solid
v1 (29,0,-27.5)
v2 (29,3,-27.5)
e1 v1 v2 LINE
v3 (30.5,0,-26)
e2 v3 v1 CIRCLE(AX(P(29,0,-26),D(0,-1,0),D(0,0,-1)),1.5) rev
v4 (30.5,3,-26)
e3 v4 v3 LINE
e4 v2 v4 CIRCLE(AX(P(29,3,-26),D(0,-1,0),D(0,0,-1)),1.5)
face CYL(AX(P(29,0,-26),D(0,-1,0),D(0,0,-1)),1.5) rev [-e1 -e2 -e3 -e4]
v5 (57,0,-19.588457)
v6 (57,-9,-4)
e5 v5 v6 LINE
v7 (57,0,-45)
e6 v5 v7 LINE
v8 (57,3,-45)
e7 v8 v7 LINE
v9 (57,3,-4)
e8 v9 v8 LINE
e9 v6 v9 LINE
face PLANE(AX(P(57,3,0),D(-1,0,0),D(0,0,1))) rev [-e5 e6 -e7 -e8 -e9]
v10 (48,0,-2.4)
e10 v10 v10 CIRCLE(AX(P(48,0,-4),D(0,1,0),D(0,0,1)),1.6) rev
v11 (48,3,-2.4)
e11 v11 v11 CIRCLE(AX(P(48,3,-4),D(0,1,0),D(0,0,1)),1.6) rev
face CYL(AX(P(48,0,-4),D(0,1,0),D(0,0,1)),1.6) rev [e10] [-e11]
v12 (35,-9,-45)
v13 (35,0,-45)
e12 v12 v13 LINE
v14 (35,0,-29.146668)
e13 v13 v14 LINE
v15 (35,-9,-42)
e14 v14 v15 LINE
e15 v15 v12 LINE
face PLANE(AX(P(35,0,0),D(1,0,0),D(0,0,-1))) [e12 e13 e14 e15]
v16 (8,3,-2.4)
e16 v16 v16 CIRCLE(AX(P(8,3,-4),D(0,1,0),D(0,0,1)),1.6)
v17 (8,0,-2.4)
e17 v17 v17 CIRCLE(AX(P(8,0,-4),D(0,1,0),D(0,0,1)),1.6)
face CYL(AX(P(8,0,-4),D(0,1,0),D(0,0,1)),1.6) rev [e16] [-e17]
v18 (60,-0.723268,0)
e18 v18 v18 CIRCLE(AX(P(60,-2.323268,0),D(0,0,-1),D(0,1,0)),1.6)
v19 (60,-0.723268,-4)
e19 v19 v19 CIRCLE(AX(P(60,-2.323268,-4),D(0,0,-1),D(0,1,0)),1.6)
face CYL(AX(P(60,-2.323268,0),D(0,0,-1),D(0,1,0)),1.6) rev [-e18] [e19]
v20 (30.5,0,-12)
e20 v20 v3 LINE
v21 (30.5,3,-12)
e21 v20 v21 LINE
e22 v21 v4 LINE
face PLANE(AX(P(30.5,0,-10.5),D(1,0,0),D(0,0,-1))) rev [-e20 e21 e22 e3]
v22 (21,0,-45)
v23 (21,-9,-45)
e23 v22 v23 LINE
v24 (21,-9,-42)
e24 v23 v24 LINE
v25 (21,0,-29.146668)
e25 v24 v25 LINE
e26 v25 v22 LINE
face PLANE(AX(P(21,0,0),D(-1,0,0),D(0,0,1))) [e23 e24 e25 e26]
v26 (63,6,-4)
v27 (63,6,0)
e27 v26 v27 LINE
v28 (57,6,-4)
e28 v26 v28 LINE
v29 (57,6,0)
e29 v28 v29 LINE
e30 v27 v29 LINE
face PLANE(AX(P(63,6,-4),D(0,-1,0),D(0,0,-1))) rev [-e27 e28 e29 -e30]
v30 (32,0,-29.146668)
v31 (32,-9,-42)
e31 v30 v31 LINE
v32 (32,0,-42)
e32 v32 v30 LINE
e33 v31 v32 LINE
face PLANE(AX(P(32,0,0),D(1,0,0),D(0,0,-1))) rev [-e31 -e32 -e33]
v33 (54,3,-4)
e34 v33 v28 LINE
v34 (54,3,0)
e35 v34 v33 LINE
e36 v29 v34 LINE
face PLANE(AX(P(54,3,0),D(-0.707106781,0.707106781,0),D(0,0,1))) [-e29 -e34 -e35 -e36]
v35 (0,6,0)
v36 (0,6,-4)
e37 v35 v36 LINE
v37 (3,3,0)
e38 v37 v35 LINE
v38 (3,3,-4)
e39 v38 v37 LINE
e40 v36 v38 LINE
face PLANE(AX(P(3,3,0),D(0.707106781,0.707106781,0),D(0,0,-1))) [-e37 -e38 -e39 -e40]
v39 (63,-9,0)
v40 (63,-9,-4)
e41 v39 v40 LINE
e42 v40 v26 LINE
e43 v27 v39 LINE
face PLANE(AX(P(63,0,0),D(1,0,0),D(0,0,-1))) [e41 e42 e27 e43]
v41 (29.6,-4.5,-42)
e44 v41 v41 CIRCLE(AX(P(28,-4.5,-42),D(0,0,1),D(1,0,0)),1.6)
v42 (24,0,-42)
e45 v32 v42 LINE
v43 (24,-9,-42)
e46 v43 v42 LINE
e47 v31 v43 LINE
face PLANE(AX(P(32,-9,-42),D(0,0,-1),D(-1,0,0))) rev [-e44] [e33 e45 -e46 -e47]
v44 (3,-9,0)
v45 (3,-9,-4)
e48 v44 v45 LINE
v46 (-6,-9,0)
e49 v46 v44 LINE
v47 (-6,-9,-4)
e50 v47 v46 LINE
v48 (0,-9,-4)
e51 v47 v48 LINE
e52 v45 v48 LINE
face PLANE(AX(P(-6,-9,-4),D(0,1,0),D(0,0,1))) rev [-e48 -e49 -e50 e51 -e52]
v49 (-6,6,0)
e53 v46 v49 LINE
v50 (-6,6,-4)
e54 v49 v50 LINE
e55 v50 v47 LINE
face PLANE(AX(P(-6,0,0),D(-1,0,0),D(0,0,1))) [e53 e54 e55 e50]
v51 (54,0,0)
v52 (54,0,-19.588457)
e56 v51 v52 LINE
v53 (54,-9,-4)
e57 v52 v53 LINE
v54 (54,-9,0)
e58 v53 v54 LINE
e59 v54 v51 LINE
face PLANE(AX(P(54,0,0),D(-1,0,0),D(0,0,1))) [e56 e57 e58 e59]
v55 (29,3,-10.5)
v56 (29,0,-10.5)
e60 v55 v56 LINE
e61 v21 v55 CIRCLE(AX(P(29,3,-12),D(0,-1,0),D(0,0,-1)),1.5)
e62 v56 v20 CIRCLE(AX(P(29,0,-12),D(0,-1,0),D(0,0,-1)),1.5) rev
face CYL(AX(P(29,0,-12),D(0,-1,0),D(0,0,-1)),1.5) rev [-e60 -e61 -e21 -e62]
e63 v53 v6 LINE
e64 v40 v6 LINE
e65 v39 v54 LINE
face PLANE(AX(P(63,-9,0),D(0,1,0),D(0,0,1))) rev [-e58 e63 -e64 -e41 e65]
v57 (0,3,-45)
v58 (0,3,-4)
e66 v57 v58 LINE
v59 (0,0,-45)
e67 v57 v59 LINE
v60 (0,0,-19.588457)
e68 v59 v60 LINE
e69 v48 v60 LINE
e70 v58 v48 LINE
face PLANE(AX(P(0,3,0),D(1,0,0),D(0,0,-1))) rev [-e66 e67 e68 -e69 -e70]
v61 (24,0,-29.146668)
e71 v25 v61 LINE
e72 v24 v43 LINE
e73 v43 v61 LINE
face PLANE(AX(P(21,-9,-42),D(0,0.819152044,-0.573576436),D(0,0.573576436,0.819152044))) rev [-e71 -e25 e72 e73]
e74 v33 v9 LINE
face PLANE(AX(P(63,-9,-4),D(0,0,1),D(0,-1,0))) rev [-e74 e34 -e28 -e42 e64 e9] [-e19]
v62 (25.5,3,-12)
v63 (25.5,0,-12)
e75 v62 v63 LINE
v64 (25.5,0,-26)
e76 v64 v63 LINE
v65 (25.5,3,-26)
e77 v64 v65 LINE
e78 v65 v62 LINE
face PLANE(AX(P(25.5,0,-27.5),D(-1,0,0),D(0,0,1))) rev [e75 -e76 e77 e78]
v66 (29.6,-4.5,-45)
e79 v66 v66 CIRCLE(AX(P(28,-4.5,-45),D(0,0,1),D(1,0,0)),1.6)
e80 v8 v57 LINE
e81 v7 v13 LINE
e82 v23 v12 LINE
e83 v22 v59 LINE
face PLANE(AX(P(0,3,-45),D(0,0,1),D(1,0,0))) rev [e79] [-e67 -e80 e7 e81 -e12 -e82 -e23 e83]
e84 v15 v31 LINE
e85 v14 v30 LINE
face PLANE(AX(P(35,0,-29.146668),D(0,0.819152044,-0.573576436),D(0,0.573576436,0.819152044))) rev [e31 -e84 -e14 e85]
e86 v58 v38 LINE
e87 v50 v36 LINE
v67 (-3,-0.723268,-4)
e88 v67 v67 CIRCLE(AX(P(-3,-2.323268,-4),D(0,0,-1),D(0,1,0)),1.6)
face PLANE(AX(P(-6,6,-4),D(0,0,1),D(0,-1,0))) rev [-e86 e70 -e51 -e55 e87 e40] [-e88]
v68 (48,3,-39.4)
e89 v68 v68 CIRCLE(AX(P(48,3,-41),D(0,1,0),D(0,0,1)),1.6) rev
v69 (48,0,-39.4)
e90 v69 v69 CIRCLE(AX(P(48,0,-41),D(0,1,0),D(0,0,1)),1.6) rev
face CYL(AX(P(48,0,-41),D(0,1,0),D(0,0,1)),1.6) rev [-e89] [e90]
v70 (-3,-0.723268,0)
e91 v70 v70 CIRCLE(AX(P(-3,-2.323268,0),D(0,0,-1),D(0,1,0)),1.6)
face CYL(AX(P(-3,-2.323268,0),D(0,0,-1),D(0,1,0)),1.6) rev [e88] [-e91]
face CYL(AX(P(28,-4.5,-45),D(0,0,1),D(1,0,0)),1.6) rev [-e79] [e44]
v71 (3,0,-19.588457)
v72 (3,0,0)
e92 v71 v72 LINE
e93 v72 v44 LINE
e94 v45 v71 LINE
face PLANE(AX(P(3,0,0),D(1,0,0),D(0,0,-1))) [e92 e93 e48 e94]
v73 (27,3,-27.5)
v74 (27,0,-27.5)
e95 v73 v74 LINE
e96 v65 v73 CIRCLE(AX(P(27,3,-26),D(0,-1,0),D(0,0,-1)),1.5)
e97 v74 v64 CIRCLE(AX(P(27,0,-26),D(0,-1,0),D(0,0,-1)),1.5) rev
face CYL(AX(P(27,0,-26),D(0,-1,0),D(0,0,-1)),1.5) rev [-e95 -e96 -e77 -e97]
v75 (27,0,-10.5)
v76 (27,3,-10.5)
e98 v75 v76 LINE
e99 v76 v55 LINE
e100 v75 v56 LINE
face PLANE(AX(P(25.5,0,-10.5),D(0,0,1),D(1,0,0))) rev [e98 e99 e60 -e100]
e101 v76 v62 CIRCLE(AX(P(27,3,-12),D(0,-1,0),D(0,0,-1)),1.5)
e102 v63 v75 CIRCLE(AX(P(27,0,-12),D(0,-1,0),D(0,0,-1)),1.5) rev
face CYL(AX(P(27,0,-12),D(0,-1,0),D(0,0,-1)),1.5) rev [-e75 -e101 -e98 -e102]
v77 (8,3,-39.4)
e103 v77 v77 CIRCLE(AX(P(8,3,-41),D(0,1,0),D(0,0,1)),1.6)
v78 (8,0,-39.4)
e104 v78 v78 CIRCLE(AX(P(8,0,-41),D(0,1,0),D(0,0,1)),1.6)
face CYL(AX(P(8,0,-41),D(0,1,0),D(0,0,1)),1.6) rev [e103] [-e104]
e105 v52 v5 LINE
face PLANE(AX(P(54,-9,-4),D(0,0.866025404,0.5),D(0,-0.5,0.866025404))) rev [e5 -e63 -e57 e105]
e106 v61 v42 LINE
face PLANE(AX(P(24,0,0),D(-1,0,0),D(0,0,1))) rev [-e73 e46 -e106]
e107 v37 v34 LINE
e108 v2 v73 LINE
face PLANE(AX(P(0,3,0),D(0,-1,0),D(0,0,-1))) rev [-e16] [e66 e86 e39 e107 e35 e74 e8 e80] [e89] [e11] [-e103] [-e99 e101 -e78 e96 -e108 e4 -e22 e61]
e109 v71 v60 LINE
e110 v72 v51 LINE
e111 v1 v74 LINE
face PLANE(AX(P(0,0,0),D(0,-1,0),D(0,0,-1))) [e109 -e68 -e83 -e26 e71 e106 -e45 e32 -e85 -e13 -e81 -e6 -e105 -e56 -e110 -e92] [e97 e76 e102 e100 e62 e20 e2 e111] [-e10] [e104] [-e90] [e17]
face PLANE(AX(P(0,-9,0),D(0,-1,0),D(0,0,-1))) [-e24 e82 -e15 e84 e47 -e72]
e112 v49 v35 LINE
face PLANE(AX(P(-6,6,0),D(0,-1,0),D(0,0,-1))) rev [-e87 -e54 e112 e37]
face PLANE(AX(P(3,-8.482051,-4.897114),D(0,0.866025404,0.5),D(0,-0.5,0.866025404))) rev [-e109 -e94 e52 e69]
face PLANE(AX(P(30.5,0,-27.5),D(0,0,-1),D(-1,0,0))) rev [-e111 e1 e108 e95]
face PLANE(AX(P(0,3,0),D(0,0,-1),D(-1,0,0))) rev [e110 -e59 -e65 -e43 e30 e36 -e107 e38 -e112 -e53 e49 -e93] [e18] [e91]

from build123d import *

# Parameters (mm, degrees)
SKETCH_1_W          = 57
SKETCH_1_H          = 45
EXTRUDE_1_DEPTH     = 3
SKETCH_2_W          = 4
SKETCH_2_H          = 15
EXTRUDE_2_DEPTH     = 6
SKETCH_3_W          = 4
SKETCH_3_H          = 15
EXTRUDE_3_DEPTH     = 6
EXTRUDE_4_DEPTH     = 3
SKETCH_5_W          = 4
SKETCH_5_H          = 9
EXTRUDE_5_DEPTH     = 3
CHAMFER_1_SIZE      = 3
SKETCH_6_R          = 1.6
CUT_EXTRUDE_1_DEPTH = 4
SKETCH_7_R          = 1.6
CUT_EXTRUDE_2_DEPTH = 3
SKETCH_8_W          = 8
SKETCH_8_H          = 3
EXTRUDE_6_DEPTH     = 9
EXTRUDE_7_DEPTH     = 3
EXTRUDE_8_DEPTH     = 3
SKETCH_11_R         = 1.6
CUT_EXTRUDE_3_DEPTH = 3
SKETCH_12_W         = 5
SKETCH_12_H         = 17
CUT_EXTRUDE_4_DEPTH = 3
FILLET_1_R          = 1.5


with BuildPart() as part:
    # 草图1 → 凸台-拉伸1 (new body)
    with BuildSketch(Plane(origin=(0, 0, 0), x_dir=(1, 0, 0), z_dir=(0, 1, 0))):
        with Locations((28.5, 22.5)):
            Rectangle(SKETCH_1_W, SKETCH_1_H)
    extrude(amount=EXTRUDE_1_DEPTH)

    # 草图2 → 凸台-拉伸2 (add)
    with BuildSketch(Plane.ZY):
        with Locations((-2, -1.5)):
            Rectangle(SKETCH_2_W, SKETCH_2_H)
    extrude(amount=EXTRUDE_2_DEPTH)

    # 草图3 → 凸台-拉伸3 (add)
    with BuildSketch(Plane(origin=(57, 0, 0), x_dir=(0, 0, -1), z_dir=(1, 0, 0))):
        with Locations((2, -1.5)):
            Rectangle(SKETCH_3_W, SKETCH_3_H)
    extrude(amount=EXTRUDE_3_DEPTH)

    # 草图4 → 凸台-拉伸4 (add)
    with BuildSketch(Plane.ZY.offset(-57)):
        Polygon((-4, -9), (-19.588457268, 0), (0, 0), (0, -9), align=None)
    extrude(amount=EXTRUDE_4_DEPTH)

    # 草图5 → 凸台-拉伸5 (add)
    with BuildSketch(Plane(origin=(0, 0, 0), x_dir=(0, 0, -1), z_dir=(1, 0, 0))):
        Polygon((19.588457268, 0), (4, 0), (4, -9), align=None)
        with Locations((2, -4.5)):
            Rectangle(SKETCH_5_W, SKETCH_5_H)
    extrude(amount=EXTRUDE_5_DEPTH)

    # 倒角1
    chamfer_1_edges = [part.edges().sort_by_distance(p)[0] for p in [
        (0, 3, -2),
        (57, 3, -2),
    ]]
    chamfer(chamfer_1_edges, length=CHAMFER_1_SIZE - 0.0001)  # a hair under: the kernel refuses the full size

    # 草图6 → 切除-拉伸1 (cut)
    with BuildSketch(Plane(origin=(0, 0, -4), x_dir=(-1, 0, 0), z_dir=(0, 0, -1))):
        with Locations(Location((3, -2.323268139, 0), (0, 0, 90))):
            Circle(SKETCH_6_R)
        with Locations(Location((-60, -2.323268139, 0), (0, 0, 90))):
            Circle(SKETCH_6_R)
    extrude(amount=-CUT_EXTRUDE_1_DEPTH, mode=Mode.SUBTRACT)

    # 草图7 → 切除-拉伸2 (cut)
    with BuildSketch(Plane(origin=(0, 3, 0), x_dir=(1, 0, 0), z_dir=(0, 1, 0))):
        with Locations(Location((8, 41, 0), (0, 0, 270))):
            Circle(SKETCH_7_R)
        with Locations(Location((8, 4, 0), (0, 0, 270))):
            Circle(SKETCH_7_R)
        with Locations(Location((48, 4, 0), (0, 0, 270))):
            Circle(SKETCH_7_R)
        with Locations(Location((48, 41, 0), (0, 0, 270))):
            Circle(SKETCH_7_R)
    extrude(amount=-CUT_EXTRUDE_2_DEPTH, mode=Mode.SUBTRACT)

    # 草图8 → 凸台-拉伸6 (add)
    with BuildSketch(Plane.XZ):
        with Locations((28, -43.5)):
            Rectangle(SKETCH_8_W, SKETCH_8_H)
    extrude(amount=EXTRUDE_6_DEPTH)

    # 草图9 → 凸台-拉伸7 (add)
    with BuildSketch(Plane(origin=(32, 0, 0), x_dir=(0, 0, -1), z_dir=(1, 0, 0))):
        Polygon((45, 0), (29.146667939, 0), (42, -9), (45, -9), align=None)
    extrude(amount=EXTRUDE_7_DEPTH)

    # 草图10 → 凸台-拉伸8 (add)
    with BuildSketch(Plane.ZY.offset(-24)):
        Polygon((-45, 0), (-45, -9), (-42, -9), (-29.146667939, 0), align=None)
    extrude(amount=EXTRUDE_8_DEPTH)

    # 草图11 → 切除-拉伸3 (cut)
    with BuildSketch(Plane.XY.offset(-42)):
        with Locations((28, -4.5)):
            Circle(SKETCH_11_R)
    extrude(amount=-CUT_EXTRUDE_3_DEPTH, mode=Mode.SUBTRACT)

    # 草图12 → 切除-拉伸4 (cut)
    with BuildSketch(Plane(origin=(0, 3, 0), x_dir=(1, 0, 0), z_dir=(0, 1, 0))):
        with Locations((28, 19)):
            Rectangle(SKETCH_12_W, SKETCH_12_H)
    extrude(amount=-CUT_EXTRUDE_4_DEPTH, mode=Mode.SUBTRACT)

    # 圆角1
    fillet_1_edges = [part.edges().sort_by_distance(p)[0] for p in [
        (25.5, 1.5, -27.5),
        (30.5, 1.5, -27.5),
        (30.5, 1.5, -10.5),
        (25.5, 1.5, -10.5),
    ]]
    fillet(fillet_1_edges, radius=FILLET_1_R)


solid = part.part
